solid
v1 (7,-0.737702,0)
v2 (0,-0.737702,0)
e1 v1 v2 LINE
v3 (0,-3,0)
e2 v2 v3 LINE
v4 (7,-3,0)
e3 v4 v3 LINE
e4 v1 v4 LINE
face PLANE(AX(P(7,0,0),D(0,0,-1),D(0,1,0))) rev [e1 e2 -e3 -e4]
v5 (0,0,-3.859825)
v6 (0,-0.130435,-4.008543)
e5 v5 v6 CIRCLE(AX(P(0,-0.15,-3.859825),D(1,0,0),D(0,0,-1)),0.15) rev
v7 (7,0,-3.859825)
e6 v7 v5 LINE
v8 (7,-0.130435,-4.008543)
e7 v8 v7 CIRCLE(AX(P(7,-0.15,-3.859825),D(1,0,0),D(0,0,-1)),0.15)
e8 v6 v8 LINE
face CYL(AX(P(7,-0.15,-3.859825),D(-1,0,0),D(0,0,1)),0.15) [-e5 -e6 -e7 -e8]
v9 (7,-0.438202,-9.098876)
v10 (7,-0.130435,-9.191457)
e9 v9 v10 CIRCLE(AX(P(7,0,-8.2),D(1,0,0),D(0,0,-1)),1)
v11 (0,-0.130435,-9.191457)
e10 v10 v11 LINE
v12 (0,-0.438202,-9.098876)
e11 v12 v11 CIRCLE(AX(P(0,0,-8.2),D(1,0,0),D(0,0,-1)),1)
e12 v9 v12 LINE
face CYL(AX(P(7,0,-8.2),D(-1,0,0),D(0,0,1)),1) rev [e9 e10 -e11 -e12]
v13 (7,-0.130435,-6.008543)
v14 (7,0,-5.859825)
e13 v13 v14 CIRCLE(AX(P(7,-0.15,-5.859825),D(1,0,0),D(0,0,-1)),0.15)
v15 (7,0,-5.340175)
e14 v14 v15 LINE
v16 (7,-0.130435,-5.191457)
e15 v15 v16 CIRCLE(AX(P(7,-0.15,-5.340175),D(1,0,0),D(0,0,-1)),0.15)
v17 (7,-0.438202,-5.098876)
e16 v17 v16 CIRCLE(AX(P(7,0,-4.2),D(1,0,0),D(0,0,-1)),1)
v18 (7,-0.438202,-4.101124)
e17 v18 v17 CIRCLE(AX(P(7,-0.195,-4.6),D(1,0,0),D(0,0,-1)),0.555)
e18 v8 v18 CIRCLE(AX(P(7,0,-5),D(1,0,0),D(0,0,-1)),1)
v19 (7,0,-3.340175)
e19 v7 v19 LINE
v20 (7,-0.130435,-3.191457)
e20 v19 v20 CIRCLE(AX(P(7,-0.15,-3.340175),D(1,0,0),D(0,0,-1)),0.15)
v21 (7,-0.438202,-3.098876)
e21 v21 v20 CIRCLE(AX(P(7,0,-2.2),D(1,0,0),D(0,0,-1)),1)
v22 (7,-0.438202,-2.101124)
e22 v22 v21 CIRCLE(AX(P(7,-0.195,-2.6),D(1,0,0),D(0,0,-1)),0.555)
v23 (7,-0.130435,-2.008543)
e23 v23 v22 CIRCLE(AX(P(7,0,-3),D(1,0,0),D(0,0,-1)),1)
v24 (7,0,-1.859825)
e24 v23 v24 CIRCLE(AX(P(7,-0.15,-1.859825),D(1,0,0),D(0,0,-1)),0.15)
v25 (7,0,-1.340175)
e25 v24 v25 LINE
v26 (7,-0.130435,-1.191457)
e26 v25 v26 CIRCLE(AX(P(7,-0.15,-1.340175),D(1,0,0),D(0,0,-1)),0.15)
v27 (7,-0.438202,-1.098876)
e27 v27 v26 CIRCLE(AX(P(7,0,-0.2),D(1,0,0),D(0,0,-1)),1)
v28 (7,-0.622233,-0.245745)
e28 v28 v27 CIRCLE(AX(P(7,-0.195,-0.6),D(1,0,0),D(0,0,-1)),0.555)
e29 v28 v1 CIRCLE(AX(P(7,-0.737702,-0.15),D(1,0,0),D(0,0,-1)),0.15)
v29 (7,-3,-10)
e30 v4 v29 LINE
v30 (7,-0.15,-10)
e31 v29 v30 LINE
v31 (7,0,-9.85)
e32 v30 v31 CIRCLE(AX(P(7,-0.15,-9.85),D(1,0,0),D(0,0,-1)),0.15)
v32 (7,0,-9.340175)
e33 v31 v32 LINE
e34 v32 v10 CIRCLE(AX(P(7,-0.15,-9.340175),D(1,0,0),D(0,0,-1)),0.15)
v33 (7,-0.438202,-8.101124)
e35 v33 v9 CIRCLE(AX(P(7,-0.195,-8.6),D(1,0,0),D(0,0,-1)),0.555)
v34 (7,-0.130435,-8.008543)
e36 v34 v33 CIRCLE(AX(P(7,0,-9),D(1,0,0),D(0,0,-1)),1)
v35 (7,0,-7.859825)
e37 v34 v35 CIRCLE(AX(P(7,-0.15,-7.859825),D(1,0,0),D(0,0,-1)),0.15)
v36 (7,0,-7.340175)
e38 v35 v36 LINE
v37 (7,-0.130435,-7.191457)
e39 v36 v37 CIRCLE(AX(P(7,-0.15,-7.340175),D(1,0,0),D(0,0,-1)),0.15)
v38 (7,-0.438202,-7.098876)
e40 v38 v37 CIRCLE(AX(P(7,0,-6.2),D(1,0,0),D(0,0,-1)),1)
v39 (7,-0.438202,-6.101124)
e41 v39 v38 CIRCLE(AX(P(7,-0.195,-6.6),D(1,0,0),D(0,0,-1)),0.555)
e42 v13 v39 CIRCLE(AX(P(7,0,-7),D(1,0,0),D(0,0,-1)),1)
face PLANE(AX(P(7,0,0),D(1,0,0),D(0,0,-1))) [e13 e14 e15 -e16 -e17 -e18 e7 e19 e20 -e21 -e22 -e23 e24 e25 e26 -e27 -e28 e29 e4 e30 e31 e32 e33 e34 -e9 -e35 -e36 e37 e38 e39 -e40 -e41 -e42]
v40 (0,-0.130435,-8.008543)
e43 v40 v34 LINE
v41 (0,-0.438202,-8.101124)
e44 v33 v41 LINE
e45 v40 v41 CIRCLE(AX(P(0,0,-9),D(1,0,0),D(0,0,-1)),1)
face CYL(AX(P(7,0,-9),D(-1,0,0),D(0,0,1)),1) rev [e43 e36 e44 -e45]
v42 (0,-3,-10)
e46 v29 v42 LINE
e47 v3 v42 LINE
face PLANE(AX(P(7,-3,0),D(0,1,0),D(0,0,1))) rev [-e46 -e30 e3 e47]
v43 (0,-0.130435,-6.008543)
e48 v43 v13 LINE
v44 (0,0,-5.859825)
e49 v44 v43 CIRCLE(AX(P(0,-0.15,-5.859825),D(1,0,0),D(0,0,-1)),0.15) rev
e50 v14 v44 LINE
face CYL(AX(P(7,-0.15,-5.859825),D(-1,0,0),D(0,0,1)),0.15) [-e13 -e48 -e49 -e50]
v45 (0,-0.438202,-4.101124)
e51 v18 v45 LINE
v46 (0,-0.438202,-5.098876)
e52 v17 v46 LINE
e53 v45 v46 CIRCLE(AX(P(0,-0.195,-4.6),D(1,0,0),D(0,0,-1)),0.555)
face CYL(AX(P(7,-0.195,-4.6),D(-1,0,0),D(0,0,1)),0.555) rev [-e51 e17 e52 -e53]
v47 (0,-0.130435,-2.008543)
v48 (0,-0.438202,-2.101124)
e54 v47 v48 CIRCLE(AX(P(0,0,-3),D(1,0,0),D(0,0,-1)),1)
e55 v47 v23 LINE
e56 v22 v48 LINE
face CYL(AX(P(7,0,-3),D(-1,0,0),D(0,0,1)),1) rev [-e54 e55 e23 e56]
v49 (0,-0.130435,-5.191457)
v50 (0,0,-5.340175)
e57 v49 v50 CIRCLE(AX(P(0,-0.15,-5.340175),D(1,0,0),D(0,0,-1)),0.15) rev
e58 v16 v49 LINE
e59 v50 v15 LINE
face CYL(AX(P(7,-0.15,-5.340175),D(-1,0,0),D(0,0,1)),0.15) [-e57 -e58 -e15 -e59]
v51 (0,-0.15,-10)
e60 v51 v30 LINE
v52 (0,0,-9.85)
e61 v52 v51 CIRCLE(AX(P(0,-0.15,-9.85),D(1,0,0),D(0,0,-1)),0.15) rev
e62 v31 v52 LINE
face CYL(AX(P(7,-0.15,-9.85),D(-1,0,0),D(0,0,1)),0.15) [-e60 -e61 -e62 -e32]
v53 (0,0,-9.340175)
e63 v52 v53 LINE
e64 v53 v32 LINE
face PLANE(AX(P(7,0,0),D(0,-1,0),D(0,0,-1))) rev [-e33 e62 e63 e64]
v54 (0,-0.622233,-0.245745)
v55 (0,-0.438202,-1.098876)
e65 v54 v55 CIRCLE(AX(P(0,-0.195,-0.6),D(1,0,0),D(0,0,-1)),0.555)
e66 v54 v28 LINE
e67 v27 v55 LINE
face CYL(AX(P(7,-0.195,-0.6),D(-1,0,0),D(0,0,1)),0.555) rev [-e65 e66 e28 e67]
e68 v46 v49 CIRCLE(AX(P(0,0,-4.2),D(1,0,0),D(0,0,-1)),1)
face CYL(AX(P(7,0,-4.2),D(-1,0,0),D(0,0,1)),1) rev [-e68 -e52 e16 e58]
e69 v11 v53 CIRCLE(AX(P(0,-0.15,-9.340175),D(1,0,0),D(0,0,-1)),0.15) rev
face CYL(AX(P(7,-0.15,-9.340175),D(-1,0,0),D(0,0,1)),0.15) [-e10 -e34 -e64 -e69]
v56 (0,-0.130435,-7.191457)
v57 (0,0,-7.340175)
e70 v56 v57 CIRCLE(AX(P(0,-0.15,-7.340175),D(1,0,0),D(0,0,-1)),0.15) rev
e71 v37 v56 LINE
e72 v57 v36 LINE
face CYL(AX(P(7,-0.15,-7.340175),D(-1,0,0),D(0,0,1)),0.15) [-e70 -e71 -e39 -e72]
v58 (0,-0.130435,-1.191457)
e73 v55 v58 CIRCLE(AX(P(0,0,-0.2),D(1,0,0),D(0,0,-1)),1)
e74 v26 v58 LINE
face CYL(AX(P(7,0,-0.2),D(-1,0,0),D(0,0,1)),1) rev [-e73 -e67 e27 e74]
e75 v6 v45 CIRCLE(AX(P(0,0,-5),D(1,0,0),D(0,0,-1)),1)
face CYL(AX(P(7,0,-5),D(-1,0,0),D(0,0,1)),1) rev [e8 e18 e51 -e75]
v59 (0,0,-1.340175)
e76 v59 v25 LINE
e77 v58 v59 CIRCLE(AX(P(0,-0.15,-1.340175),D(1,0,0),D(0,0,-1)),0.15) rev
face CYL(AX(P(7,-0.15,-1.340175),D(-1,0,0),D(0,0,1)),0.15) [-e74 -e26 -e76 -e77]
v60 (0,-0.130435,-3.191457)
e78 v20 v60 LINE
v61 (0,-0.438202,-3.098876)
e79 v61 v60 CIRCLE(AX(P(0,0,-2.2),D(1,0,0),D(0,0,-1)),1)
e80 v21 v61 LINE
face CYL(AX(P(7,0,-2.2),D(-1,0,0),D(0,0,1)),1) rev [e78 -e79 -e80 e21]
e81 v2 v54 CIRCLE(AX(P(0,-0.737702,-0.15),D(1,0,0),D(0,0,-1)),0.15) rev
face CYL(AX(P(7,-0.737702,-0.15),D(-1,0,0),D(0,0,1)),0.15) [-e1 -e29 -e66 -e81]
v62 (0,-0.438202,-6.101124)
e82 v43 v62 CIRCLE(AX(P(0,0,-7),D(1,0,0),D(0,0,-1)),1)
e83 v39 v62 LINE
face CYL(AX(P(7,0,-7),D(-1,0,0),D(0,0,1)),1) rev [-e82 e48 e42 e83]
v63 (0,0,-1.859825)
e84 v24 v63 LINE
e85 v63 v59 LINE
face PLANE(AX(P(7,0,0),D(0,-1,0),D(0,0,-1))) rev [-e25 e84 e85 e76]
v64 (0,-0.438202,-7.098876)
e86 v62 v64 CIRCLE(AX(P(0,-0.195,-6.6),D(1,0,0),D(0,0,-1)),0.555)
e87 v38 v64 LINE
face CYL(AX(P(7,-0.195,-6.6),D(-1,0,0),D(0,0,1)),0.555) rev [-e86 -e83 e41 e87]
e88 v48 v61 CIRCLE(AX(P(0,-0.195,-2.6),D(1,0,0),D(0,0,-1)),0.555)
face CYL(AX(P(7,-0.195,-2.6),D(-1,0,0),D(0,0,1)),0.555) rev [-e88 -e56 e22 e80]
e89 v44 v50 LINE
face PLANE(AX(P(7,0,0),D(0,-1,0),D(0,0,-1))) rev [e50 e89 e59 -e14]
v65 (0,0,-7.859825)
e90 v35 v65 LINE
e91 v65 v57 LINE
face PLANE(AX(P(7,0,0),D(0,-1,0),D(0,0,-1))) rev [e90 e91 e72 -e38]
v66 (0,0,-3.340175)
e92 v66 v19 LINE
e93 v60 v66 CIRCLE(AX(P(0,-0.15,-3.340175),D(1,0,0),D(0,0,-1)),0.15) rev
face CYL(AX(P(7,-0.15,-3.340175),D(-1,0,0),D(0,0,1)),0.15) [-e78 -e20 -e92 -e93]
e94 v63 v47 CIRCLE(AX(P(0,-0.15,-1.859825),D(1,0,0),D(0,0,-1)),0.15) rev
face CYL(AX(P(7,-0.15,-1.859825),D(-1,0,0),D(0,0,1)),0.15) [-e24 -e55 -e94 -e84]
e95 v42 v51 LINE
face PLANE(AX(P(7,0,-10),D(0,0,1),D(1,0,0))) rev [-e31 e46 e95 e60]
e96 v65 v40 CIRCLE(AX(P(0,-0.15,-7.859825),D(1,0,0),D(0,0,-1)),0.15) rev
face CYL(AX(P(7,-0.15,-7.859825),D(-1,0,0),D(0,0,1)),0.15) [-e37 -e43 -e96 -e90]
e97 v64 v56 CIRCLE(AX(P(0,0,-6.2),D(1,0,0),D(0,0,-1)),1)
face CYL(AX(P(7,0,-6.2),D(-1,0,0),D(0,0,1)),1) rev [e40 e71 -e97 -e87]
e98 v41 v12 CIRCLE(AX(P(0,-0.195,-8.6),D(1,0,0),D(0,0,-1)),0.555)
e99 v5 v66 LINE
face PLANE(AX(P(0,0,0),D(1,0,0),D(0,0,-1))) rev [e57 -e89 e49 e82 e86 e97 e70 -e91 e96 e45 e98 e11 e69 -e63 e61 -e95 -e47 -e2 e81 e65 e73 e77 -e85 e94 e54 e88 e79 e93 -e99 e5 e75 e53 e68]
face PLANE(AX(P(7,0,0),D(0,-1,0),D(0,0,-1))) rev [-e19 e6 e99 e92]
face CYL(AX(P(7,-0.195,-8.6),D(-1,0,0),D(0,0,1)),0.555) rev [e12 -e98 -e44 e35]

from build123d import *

# Parameters (mm, degrees)
SKETCH2_W           = 10
SKETCH2_H           = 3
BOSS_EXTRUDE1_DEPTH = 7
CUT_EXTRUDE2_DEPTH  = 13.56980509
LPATTERN2_COUNT     = 10
LPATTERN2_PITCH     = 2
FILLET2_START       = -1
FILLET2_DEPTH       = 9


with BuildPart() as part:
    # Sketch2 → Boss-Extrude1 (new body)
    with BuildSketch(Plane(origin=(0, 0, 0), x_dir=(0, 0, -1), z_dir=(1, 0, 0))):
        with Locations((5, -1.5)):
            Rectangle(SKETCH2_W, SKETCH2_H)
    extrude(amount=BOSS_EXTRUDE1_DEPTH)

    # Sketch1 → Cut-Extrude2 (cut, through all)
    with BuildSketch(Plane(origin=(0, 0, 0), x_dir=(0, 0, -1), z_dir=(1, 0, 0))):
        with BuildLine():
            ThreePointArc((0.10112359, -0.438202237), (0.045620517, -0.221237163), (0.080384758, 0))
            Line((0.080384758, 0), (0, 0))
            ThreePointArc((0, 0), (0.025608803, -0.224859501), (0.10112359, -0.438202237))
        make_face()
        with BuildLine():
            ThreePointArc((1.155, -0.195), (1.146082164, -0.095907769), (1.119615242, 0))
            Line((1.119615242, 0), (0.080384758, 0))
            ThreePointArc((0.080384758, 0), (0.045620517, -0.221237163), (0.10112359, -0.438202237))
            ThreePointArc((0.10112359, -0.438202237), (0.6, -0.75), (1.09887641, -0.438202237))
            ThreePointArc((1.09887641, -0.438202237), (1.140787115, -0.319797021), (1.155, -0.195))
        make_face()
        with BuildLine():
            Line((0.080384758, 0), (1.119615242, 0))
            ThreePointArc((1.119615242, 0), (0.6, 0.36), (0.080384758, 0))
        make_face()
        with BuildLine():
            ThreePointArc((1.09887641, -0.438202237), (1.174391197, -0.224859501), (1.2, 0))
            Line((1.2, 0), (1.119615242, 0))
            ThreePointArc((1.119615242, 0), (1.146082164, -0.095907769), (1.155, -0.195))
            ThreePointArc((1.155, -0.195), (1.140787115, -0.319797021), (1.09887641, -0.438202237))
        make_face()
    cut_extrude2 = extrude(amount=CUT_EXTRUDE2_DEPTH, mode=Mode.SUBTRACT)

    # LPattern2: Cut-Extrude2 ×10
    with Locations(*[(0, 0, -i * LPATTERN2_PITCH) for i in range(1, LPATTERN2_COUNT)]):
        add(cut_extrude2, mode=Mode.SUBTRACT)

    # Fillet2: read off the stored shape, not the designer's step
    # Fillet2 outline → Fillet2 (cut)
    with BuildSketch(Plane.YZ.offset(FILLET2_START)):
        with BuildLine():
            Line((0, -10), (0, -9.85))
            ThreePointArc((0, -9.85), (-0.043933983, -9.956066017), (-0.15, -10))
            Line((-0.15, -10), (0, -10))
        make_face()
        with BuildLine():
            ThreePointArc((-0.130434783, -9.191456891), (-0.037228588, -9.241268354), (0, -9.340175425))
            Line((0, -9.340175425), (0, -9.2))
            ThreePointArc((0, -9.2), (-0.065357129, -9.197861937), (-0.130434783, -9.191456891))
        make_face()
        with BuildLine():
            Line((0, -8), (0, -7.859824575))
            ThreePointArc((0, -7.859824575), (-0.037228588, -7.958731646), (-0.130434783, -8.008543109))
            ThreePointArc((-0.130434783, -8.008543109), (-0.065357129, -8.002138063), (0, -8))
        make_face()
        with BuildLine():
            ThreePointArc((-0.130434783, -7.191456891), (-0.037228588, -7.241268354), (0, -7.340175425))
            Line((0, -7.340175425), (0, -7.2))
            ThreePointArc((0, -7.2), (-0.065357129, -7.197861937), (-0.130434783, -7.191456891))
        make_face()
        with BuildLine():
            Line((0, -6), (0, -5.859824575))
            ThreePointArc((0, -5.859824575), (-0.037228588, -5.958731646), (-0.130434783, -6.008543109))
            ThreePointArc((-0.130434783, -6.008543109), (-0.065357129, -6.002138063), (0, -6))
        make_face()
        with BuildLine():
            ThreePointArc((-0.130434783, -5.191456891), (-0.037228588, -5.241268354), (0, -5.340175425))
            Line((0, -5.340175425), (0, -5.2))
            ThreePointArc((0, -5.2), (-0.065357129, -5.197861937), (-0.130434783, -5.191456891))
        make_face()
        with BuildLine():
            Line((0, -4), (0, -3.859824575))
            ThreePointArc((0, -3.859824575), (-0.037228588, -3.958731646), (-0.130434783, -4.008543109))
            ThreePointArc((-0.130434783, -4.008543109), (-0.065357129, -4.002138063), (0, -4))
        make_face()
        with BuildLine():
            ThreePointArc((-0.130434783, -3.191456891), (-0.037228588, -3.241268354), (0, -3.340175425))
            Line((0, -3.340175425), (0, -3.2))
            ThreePointArc((0, -3.2), (-0.065357129, -3.197861937), (-0.130434783, -3.191456891))
        make_face()
        with BuildLine():
            Line((0, -2), (0, -1.859824575))
            ThreePointArc((0, -1.859824575), (-0.037228588, -1.958731646), (-0.130434783, -2.008543109))
            ThreePointArc((-0.130434783, -2.008543109), (-0.065357129, -2.002138063), (0, -2))
        make_face()
        with BuildLine():
            ThreePointArc((-0.737701575, 0), (-0.601941305, -0.086210119), (-0.622233155, -0.245744681))
            ThreePointArc((-0.622233155, -0.245744681), (-0.537928158, -0.163622551), (-0.438202247, -0.101123596))
            ThreePointArc((-0.438202247, -0.101123596), (-0.224859507, -0.025608804), (0, 0))
            Line((0, 0), (-0.737701575, 0))
        make_face()
        with BuildLine():
            ThreePointArc((-0.130434783, -1.191456891), (-0.037228588, -1.241268354), (0, -1.340175425))
            Line((0, -1.340175425), (0, -1.2))
            ThreePointArc((0, -1.2), (-0.065357129, -1.197861937), (-0.130434783, -1.191456891))
        make_face()
    extrude(amount=FILLET2_DEPTH, mode=Mode.SUBTRACT)


solid = part.part
